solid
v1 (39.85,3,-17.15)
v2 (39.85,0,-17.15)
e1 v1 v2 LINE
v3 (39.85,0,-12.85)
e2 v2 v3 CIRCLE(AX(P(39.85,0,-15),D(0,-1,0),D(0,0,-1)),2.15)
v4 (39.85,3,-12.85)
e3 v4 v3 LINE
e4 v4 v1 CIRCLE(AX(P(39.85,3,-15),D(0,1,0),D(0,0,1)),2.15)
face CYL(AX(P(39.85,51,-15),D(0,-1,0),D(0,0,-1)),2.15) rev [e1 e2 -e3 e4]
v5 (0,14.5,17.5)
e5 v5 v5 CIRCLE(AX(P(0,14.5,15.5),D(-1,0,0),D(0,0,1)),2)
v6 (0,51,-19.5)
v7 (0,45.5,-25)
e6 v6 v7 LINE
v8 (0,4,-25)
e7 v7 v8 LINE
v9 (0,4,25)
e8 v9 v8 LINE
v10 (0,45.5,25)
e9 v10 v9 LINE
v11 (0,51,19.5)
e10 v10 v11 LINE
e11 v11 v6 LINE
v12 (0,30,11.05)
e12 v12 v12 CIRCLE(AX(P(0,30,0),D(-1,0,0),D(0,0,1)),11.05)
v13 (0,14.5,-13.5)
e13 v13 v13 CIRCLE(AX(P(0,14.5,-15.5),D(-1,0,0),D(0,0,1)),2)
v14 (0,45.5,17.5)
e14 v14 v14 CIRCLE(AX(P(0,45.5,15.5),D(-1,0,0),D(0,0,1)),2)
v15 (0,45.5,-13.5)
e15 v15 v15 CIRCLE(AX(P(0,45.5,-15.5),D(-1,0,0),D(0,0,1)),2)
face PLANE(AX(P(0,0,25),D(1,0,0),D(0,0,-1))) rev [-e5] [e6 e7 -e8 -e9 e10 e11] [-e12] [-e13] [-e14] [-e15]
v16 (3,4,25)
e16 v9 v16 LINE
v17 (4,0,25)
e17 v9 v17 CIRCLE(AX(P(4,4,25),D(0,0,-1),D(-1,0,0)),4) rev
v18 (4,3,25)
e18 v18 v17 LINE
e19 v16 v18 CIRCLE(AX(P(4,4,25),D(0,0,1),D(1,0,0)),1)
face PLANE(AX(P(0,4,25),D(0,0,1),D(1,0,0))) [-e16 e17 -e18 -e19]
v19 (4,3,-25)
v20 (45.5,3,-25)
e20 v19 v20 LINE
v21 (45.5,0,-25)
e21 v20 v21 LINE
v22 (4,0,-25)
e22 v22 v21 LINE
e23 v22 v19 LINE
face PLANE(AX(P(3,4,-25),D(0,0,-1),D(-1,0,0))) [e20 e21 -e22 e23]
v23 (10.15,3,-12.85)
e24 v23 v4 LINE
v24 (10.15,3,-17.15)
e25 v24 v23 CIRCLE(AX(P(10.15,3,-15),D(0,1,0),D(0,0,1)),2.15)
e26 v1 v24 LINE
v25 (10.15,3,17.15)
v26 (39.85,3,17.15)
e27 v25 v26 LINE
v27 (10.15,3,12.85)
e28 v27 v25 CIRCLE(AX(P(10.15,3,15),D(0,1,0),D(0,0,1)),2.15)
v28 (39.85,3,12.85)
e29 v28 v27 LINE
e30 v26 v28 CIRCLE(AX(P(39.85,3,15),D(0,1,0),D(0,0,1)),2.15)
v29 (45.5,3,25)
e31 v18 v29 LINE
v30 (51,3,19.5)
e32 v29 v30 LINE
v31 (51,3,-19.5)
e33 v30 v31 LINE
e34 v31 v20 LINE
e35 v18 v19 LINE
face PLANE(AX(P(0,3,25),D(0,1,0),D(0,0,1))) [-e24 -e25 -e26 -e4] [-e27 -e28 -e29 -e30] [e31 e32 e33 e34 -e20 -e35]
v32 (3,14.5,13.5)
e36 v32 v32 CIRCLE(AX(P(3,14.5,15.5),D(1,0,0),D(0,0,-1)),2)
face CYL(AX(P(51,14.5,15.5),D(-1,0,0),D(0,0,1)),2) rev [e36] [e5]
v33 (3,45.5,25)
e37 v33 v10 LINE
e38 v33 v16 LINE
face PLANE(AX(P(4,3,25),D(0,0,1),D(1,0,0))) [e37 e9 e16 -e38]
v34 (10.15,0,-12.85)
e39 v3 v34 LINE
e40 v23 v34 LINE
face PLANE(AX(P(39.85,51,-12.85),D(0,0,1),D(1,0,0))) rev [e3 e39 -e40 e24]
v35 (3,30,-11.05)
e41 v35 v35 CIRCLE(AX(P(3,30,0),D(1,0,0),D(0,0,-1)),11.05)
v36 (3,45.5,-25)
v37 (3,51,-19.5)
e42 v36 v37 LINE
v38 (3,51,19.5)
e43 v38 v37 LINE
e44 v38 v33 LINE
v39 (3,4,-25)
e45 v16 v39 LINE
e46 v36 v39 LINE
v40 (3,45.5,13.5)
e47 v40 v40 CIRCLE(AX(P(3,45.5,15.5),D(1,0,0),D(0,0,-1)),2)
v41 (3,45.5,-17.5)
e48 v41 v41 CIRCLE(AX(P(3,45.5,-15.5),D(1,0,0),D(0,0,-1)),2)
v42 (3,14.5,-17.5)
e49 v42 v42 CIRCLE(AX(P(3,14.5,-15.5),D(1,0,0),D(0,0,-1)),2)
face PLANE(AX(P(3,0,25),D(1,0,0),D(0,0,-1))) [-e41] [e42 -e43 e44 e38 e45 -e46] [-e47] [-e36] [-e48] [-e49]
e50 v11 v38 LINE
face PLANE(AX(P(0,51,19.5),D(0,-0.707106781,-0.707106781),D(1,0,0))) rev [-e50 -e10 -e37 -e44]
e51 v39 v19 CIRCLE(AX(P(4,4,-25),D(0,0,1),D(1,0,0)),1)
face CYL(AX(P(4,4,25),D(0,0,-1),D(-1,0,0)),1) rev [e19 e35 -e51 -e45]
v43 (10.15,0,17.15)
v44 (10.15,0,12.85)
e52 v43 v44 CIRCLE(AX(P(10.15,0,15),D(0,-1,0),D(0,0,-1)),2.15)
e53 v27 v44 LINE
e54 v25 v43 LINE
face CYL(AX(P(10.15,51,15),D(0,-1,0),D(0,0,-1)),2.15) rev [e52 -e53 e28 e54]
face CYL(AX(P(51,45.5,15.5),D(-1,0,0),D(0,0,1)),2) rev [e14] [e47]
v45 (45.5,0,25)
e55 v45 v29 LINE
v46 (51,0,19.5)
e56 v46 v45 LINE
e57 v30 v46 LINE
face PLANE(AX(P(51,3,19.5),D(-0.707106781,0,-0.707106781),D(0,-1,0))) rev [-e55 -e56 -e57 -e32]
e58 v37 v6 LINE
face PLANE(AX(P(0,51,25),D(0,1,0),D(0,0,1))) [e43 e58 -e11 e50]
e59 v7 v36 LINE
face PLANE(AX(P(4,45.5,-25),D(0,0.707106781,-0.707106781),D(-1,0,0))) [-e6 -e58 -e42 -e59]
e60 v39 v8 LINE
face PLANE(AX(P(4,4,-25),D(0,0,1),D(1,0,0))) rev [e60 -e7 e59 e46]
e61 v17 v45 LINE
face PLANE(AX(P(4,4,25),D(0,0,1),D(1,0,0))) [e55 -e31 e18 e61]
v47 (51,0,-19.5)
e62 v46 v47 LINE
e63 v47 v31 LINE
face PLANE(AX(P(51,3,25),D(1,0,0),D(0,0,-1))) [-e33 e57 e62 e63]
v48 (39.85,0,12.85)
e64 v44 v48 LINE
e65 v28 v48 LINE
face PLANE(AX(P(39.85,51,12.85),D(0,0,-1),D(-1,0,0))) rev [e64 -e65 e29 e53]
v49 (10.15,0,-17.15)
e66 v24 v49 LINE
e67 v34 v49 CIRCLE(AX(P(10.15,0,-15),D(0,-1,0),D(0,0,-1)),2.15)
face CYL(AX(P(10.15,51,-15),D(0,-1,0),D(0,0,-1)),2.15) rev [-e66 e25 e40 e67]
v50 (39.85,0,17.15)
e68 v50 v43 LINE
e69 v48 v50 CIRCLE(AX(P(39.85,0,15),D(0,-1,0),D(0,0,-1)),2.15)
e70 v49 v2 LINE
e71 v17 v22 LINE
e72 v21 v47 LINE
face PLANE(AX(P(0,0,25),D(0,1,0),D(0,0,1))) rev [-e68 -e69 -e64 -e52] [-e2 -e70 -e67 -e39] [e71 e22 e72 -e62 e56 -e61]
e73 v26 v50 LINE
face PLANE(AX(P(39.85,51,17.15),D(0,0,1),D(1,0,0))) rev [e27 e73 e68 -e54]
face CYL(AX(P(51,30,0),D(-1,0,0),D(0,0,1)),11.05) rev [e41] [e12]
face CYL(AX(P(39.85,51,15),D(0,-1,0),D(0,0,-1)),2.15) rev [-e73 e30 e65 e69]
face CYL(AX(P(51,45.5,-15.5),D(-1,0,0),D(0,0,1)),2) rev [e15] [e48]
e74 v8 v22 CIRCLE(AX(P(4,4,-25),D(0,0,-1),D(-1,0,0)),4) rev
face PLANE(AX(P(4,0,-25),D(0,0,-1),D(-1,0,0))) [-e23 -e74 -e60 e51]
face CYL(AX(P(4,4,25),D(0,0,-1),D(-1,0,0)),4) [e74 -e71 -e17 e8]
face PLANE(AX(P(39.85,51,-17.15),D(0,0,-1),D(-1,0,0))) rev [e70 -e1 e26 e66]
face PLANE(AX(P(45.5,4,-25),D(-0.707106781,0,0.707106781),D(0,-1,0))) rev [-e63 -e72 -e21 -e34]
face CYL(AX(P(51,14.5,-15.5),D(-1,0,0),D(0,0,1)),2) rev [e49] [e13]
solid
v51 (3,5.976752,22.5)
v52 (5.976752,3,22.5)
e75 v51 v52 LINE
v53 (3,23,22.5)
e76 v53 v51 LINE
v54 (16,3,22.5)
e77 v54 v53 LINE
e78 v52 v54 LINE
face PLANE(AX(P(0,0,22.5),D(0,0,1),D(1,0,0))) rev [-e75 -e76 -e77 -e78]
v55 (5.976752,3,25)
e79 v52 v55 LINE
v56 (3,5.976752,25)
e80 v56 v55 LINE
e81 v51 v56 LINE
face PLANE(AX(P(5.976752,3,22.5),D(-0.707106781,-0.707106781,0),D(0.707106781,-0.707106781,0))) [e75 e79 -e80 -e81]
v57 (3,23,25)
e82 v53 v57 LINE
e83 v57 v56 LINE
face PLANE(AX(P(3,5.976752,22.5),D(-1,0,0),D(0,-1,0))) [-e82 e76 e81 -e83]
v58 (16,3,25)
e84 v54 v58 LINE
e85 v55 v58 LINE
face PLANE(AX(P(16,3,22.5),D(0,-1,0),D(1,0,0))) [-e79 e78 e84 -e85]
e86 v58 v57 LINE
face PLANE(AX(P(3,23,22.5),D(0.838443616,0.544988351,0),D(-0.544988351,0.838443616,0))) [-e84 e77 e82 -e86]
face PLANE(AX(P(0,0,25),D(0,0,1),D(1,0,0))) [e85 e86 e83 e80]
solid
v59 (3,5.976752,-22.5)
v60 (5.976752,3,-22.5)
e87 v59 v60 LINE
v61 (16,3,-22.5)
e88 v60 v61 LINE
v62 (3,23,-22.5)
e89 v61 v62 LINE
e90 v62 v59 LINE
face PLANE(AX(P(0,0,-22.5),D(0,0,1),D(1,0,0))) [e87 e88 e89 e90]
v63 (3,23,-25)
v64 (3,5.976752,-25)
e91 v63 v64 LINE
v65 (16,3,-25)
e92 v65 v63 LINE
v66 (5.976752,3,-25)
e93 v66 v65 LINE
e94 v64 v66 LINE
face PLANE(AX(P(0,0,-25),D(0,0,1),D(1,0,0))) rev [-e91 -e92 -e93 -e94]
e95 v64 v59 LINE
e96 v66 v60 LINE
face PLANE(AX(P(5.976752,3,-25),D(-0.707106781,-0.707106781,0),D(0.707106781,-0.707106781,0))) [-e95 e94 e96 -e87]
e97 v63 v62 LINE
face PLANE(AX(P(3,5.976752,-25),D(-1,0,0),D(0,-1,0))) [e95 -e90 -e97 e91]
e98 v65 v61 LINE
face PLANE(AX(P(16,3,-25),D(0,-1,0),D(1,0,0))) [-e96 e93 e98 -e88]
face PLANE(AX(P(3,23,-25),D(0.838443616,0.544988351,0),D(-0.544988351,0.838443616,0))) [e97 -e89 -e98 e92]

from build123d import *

# Parameters (mm, degrees)
BASE_FLANGE1_DEPTH  = 25
SKETCH7_R           = 11.05
SKETCH7_R_2         = 2
CUT_EXTRUDE1_DEPTH  = 77.334788924
CUT_EXTRUDE2_DEPTH  = 77.334788924
CHAMFER2_SIZE       = 5.5
BOSS_EXTRUDE2_DEPTH = 2.5
LPATTERN1_COUNT     = 2
LPATTERN1_PITCH     = 47.5


# Sheet-metal steps are written as plain solids
with BuildPart() as part:
    # Sketch2 → Base-Flange1 (new, symmetric)
    with BuildSketch(Plane.XY):
        with BuildLine():
            Line((51, 0), (4, 0))
            ThreePointArc((4, 0), (1.171572875, 1.171572875), (0, 4))
            Line((0, 4), (0, 51))
            Line((0, 51), (3, 51))
            Line((3, 51), (3, 4))
            ThreePointArc((3, 4), (3.292893219, 3.292893219), (4, 3))
            Line((4, 3), (51, 3))
            Line((51, 3), (51, 0))
        make_face()
    extrude(amount=BASE_FLANGE1_DEPTH, both=True)

    # Sketch7 → Cut-Extrude1 (cut, through all)
    with BuildSketch(Plane.ZY):
        with Locations((0, 30)):
            Circle(SKETCH7_R)
        with Locations((-15.5, 45.5)):
            Circle(SKETCH7_R_2)
        with Locations((15.5, 45.5)):
            Circle(SKETCH7_R_2)
        with Locations((15.5, 14.5)):
            Circle(SKETCH7_R_2)
        with Locations((-15.5, 14.5)):
            Circle(SKETCH7_R_2)
    extrude(amount=-CUT_EXTRUDE1_DEPTH, mode=Mode.SUBTRACT)

    # Sketch8 → Cut-Extrude2 (cut, through all)
    with BuildSketch(Plane.XZ):
        with BuildLine():
            Line((39.85, -17.15), (10.15, -17.15))
            ThreePointArc((10.15, -17.15), (8, -15), (10.15, -12.85))
            Line((10.15, -12.85), (39.85, -12.85))
            ThreePointArc((39.85, -12.85), (42, -15), (39.85, -17.15))
        make_face()
        with BuildLine():
            Line((39.85, 12.85), (10.15, 12.85))
            ThreePointArc((10.15, 12.85), (8, 15), (10.15, 17.15))
            Line((10.15, 17.15), (39.85, 17.15))
            ThreePointArc((39.85, 17.15), (42, 15), (39.85, 12.85))
        make_face()
    extrude(amount=-CUT_EXTRUDE2_DEPTH, mode=Mode.SUBTRACT)

    # Chamfer2
    chamfer2_edges = [part.edges().sort_by_distance(p)[0] for p in [
        (1.5, 51, 25),
        (51, 1.5, 25),
        (1.5, 51, -25),
        (51, 1.5, -25),
    ]]
    chamfer(chamfer2_edges, length=CHAMFER2_SIZE)


with BuildPart() as body_2:
    # Sketch9 → Boss-Extrude2 (new body)
    with BuildSketch(Plane.XY.offset(25)):
        Polygon((3, 23), (16, 3), (5.976752293, 3), (3, 5.976752293), align=None)
    boss_extrude2 = extrude(amount=-BOSS_EXTRUDE2_DEPTH)


with BuildPart() as lpattern1_1:
    # LPattern1: Boss-Extrude2 ×2
    with Locations(*[(0, 0, -i * LPATTERN1_PITCH) for i in range(1, LPATTERN1_COUNT)]):
        add(boss_extrude2)


solid = Compound([part.part, body_2.part, lpattern1_1.part])
